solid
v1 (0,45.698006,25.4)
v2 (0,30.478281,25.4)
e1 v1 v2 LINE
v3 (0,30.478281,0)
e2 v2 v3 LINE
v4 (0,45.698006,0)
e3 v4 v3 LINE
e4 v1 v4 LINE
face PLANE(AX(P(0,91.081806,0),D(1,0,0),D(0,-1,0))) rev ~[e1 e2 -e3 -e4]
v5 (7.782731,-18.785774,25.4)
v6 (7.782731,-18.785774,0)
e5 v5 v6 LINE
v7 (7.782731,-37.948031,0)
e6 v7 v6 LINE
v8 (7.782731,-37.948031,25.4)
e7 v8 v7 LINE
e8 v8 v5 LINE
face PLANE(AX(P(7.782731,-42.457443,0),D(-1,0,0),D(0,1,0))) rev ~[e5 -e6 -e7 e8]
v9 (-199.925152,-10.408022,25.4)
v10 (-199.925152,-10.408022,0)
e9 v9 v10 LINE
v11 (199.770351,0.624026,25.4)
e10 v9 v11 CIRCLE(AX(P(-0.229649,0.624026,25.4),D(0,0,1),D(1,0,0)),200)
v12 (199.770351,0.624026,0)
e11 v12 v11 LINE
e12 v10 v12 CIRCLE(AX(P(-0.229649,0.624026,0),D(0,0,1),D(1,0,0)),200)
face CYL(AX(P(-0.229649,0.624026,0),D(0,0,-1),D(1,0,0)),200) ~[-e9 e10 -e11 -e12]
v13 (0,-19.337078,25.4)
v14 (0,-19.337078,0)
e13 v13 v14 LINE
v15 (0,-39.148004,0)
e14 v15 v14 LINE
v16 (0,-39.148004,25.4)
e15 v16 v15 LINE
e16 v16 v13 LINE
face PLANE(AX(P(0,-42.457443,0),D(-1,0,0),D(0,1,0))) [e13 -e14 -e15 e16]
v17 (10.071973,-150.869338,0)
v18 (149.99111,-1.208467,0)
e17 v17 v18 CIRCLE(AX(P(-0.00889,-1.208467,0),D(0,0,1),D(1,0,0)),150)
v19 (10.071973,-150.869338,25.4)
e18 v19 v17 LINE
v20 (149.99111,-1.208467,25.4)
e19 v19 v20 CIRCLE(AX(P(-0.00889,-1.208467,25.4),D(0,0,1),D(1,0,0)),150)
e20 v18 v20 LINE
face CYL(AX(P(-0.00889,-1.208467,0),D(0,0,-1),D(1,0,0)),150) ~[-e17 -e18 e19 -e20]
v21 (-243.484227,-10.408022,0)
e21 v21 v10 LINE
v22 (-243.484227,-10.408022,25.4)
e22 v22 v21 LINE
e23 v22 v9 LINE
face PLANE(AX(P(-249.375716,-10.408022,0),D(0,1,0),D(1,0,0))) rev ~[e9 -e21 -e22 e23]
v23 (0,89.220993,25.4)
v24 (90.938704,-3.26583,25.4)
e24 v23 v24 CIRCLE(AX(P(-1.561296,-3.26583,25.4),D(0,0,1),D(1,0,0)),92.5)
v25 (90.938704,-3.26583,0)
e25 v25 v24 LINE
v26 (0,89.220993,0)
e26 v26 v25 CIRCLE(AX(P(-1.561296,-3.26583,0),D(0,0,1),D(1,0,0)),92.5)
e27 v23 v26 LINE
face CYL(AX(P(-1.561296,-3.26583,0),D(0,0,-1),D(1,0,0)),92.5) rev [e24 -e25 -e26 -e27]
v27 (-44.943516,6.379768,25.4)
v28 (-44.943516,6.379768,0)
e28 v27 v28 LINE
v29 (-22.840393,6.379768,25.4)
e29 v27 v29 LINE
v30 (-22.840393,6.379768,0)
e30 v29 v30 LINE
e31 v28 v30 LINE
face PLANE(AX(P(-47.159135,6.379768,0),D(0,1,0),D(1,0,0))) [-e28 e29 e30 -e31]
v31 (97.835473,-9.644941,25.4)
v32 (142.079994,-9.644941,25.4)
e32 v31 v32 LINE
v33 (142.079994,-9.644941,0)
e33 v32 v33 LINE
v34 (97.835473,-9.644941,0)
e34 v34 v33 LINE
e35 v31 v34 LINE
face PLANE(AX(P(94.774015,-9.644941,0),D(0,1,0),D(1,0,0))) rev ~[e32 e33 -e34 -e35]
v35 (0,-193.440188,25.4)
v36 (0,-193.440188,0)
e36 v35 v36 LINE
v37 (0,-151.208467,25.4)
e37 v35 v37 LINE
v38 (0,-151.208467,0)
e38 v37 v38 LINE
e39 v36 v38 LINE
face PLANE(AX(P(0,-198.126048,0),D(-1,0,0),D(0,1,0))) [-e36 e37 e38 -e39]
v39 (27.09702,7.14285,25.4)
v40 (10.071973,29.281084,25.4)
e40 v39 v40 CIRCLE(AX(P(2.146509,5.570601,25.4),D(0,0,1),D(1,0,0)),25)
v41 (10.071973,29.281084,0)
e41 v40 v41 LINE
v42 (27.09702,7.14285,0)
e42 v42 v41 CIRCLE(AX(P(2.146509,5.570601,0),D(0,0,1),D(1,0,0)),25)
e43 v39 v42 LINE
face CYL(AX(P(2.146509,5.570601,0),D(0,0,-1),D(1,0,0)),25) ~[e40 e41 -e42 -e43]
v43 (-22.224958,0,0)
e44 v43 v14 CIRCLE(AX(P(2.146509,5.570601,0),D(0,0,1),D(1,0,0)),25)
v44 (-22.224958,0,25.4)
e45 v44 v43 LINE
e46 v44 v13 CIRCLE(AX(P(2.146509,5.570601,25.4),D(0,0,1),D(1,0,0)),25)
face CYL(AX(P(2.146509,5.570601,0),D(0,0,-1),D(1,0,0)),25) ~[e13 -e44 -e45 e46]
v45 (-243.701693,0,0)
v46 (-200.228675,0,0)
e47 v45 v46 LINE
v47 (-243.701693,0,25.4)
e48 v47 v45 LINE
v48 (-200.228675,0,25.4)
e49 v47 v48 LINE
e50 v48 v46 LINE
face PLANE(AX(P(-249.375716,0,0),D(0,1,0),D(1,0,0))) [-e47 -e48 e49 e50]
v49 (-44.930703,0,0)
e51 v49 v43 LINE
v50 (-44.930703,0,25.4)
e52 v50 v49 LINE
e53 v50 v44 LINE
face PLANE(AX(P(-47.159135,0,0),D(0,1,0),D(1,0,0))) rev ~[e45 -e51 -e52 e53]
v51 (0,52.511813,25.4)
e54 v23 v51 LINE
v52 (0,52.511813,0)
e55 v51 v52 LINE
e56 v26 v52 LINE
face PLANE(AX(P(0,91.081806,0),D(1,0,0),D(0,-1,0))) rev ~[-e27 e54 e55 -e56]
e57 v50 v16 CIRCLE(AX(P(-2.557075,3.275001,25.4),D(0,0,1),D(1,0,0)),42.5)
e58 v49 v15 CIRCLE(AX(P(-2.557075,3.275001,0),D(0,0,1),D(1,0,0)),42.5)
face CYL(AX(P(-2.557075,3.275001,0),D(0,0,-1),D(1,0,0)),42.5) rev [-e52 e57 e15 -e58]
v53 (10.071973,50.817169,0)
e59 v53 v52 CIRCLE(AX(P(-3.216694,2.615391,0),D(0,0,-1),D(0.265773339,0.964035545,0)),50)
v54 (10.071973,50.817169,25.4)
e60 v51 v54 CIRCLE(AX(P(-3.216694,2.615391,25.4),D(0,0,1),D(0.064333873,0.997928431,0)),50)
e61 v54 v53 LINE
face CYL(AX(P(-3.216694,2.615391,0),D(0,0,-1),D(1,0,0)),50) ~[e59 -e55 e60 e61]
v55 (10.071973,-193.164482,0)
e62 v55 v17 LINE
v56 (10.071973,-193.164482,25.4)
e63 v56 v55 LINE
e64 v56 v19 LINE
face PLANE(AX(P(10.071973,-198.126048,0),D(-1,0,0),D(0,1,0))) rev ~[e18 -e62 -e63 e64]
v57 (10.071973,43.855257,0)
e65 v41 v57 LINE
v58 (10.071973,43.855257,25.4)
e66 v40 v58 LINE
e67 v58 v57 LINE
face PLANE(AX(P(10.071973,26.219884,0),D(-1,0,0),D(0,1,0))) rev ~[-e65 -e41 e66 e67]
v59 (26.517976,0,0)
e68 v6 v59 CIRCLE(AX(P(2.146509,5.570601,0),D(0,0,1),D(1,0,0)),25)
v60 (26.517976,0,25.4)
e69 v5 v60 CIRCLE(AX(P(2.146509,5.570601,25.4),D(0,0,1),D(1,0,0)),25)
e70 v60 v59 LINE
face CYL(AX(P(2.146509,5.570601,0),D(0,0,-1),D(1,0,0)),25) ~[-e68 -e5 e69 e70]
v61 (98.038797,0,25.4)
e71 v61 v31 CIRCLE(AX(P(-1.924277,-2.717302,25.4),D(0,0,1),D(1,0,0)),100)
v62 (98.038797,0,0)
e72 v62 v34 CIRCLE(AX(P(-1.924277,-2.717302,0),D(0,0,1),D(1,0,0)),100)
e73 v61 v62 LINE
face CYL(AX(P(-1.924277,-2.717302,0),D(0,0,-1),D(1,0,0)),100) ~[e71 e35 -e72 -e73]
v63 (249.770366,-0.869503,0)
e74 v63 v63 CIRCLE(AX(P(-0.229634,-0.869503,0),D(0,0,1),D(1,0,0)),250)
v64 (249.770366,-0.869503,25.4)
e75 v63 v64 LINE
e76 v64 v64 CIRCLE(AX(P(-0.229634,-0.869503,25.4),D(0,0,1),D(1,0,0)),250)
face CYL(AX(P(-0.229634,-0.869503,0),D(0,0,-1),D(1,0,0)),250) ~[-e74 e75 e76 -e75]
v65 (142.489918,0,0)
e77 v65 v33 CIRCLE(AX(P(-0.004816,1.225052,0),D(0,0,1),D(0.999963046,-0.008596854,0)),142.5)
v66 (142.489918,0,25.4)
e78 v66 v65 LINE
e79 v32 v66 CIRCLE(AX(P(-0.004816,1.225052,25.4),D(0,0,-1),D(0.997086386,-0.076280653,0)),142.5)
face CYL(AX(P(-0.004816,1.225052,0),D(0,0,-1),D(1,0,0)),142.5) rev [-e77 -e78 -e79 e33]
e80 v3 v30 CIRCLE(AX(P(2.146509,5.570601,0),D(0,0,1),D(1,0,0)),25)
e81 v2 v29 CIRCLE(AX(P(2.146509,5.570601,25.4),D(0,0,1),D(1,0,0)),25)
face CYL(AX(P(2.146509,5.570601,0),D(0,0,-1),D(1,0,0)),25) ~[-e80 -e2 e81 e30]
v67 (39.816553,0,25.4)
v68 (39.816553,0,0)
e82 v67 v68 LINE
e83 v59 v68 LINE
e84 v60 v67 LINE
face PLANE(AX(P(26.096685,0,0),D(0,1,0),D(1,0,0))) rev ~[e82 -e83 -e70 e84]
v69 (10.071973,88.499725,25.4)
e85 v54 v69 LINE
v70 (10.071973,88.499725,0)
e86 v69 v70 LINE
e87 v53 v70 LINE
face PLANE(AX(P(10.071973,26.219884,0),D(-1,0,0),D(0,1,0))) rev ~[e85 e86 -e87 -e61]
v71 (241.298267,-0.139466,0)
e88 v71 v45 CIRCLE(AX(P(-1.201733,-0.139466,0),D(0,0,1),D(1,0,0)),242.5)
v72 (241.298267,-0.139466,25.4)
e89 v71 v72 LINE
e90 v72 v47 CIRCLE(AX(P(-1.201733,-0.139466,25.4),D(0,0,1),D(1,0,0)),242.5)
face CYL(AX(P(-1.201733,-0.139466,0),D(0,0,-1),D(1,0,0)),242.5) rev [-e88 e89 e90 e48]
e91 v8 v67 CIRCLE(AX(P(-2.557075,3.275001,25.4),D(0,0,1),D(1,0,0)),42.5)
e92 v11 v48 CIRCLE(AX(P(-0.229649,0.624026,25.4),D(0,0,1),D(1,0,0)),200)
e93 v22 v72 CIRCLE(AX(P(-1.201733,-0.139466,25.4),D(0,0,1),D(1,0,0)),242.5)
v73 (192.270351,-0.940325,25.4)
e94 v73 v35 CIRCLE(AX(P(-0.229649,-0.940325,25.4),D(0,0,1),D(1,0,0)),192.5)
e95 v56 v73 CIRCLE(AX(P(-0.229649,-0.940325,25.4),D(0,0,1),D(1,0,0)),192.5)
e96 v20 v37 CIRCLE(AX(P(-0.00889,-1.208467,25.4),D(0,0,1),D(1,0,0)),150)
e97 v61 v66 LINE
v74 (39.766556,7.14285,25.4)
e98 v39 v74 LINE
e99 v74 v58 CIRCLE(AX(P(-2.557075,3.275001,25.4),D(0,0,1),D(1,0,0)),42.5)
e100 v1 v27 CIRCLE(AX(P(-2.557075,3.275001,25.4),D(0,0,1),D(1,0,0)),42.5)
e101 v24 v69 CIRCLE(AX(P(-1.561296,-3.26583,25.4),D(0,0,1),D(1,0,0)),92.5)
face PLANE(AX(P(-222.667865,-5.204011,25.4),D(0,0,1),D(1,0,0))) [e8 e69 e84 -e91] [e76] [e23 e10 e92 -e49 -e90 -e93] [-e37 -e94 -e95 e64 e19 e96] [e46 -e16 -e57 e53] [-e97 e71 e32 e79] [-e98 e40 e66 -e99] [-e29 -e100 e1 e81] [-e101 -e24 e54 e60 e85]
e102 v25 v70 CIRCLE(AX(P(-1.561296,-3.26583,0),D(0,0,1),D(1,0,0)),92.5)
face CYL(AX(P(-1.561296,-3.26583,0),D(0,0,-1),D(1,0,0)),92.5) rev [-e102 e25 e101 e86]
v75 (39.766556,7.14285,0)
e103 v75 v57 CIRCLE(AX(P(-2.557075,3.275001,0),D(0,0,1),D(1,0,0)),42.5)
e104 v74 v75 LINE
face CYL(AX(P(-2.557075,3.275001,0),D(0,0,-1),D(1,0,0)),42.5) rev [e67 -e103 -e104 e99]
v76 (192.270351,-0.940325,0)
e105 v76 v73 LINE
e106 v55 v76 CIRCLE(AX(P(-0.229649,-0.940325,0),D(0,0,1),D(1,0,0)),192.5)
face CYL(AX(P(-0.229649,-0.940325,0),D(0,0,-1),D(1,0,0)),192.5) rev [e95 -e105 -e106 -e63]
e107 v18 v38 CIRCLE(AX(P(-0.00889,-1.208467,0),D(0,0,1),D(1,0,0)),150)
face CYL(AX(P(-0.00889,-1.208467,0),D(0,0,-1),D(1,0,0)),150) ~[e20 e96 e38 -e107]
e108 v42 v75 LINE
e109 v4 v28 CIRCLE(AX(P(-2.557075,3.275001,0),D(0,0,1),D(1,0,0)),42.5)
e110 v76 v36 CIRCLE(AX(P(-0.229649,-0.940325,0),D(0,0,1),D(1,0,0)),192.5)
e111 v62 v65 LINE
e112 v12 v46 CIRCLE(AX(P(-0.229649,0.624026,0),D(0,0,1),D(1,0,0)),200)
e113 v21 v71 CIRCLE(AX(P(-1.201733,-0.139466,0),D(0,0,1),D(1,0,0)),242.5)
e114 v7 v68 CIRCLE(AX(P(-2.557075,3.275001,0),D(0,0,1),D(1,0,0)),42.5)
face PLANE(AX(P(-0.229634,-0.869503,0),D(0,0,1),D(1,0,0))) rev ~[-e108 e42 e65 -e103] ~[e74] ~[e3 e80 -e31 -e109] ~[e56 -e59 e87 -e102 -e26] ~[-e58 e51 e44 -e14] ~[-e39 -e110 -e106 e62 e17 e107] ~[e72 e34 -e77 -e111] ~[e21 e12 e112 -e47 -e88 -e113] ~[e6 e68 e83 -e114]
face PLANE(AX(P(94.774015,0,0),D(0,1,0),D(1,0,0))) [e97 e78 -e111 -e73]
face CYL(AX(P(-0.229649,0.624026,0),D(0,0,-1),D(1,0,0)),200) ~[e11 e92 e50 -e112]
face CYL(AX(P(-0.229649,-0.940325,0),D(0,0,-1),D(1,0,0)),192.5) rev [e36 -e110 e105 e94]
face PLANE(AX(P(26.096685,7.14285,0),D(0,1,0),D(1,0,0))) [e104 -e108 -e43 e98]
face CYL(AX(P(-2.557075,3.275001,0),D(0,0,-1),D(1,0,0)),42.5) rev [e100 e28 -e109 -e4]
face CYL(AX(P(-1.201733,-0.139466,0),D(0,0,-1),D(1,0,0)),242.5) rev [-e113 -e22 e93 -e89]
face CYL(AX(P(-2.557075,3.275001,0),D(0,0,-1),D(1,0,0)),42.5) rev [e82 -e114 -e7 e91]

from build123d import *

# Parameters (mm, degrees)
F0_R      = 250
F0_R_2    = 242.5
F6_DEPTH  = 25.4
F1_R      = 200
F1_R_2    = 192.5
F7_DEPTH  = 25.4
F2_R      = 150
F2_R_2    = 142.5
F8_DEPTH  = 25.4
F3_R      = 100
F3_R_2    = 92.5
F9_DEPTH  = 25.4
F4_R      = 50
F4_R_2    = 42.5
F10_DEPTH = 25.4
F5_R      = 25
F11_DEPTH = 25.4
F12_W     = 53.4157007933
F12_H     = 10.408022441
F12_W_2   = 10.0719733164
F12_H_2   = 50.3633767366
F12_W_3   = 52.6525899768
F12_H_3   = 9.6449414268
F12_H_4   = 41.9694781303
F12_H_5   = 22.8924434632
F12_W_4   = 30.523262918
F12_H_6   = 6.3797682524
F12_W_5   = 17.5508763641
F12_H_7   = 7.1428497322
F12_W_6   = 7.7827312052
F12_H_8   = 28.9970943704
F13_DEPTH = 25.4


with BuildPart() as f6:
    # F0 (on Top) → F6 (new body)
    with BuildSketch(Plane.XY):
        with Locations((-0.2296342573, -0.8695026627)):
            Circle(F0_R)
        with Locations((-1.2017333358, -0.1394655317)):
            Circle(F0_R_2, mode=Mode.SUBTRACT)
    extrude(amount=F6_DEPTH)



with BuildPart() as f7:
    # F1 (on Top) → F7 (new body)
    with BuildSketch(Plane.XY):
        with Locations((-0.229648911, 0.6240262301)):
            Circle(F1_R)
        with Locations((-0.229648911, -0.9403247815)):
            Circle(F1_R_2, mode=Mode.SUBTRACT)
    extrude(amount=F7_DEPTH)


with BuildPart() as f8:
    # F2 (on Top) → F8 (new body)
    with BuildSketch(Plane.XY):
        with Locations((-0.0088901297, -1.2084672926)):
            Circle(F2_R)
        with Locations((-0.0048156621, 1.2250516324)):
            Circle(F2_R_2, mode=Mode.SUBTRACT)
    extrude(amount=F8_DEPTH)


with BuildPart() as f9:
    # F3 (on Top) → F9 (new body)
    with BuildSketch(Plane.XY):
        with Locations((-1.9242773997, -2.7173017152)):
            Circle(F3_R)
        with Locations((-1.5612963189, -3.2658300582)):
            Circle(F3_R_2, mode=Mode.SUBTRACT)
    extrude(amount=F9_DEPTH)


with BuildPart() as f10:
    # F4 (on Top) → F10 (new body)
    with BuildSketch(Plane.XY):
        with Locations((-3.2166936435, 2.6153912768)):
            Circle(F4_R)
        with Locations((-2.5570748915, 3.2750012369)):
            Circle(F4_R_2, mode=Mode.SUBTRACT)
    extrude(amount=F10_DEPTH)


with BuildPart() as f11:
    # F5 (on Top) → F11 (new body)
    with BuildSketch(Plane.XY):
        with Locations((2.1465087775, 5.5706012063)):
            Circle(F5_R)
    extrude(amount=F11_DEPTH)


with BuildPart() as f6_1:
    add(f6.part)

    add(f7.part)  # F13 merges F7

    add(f8.part)  # F13 merges F8

    add(f9.part)  # F13 merges F9

    add(f10.part)  # F13 merges F10

    add(f11.part)  # F13 merges F11
    # F12 (on face) → F13 (join)
    with BuildSketch(Plane.XY):
        with Locations((-222.6678654552, -5.2040112205)):
            Rectangle(F12_W, F12_H)
        with Locations((5.0359866582, -172.9443594813)):
            Rectangle(F12_W_2, F12_H_2)
        with Locations((121.1003102362, -4.8224707134)):
            Rectangle(F12_W_3, F12_H_3)
        with Locations((5.0359866582, 70.097066462)):
            Rectangle(F12_W_2, F12_H_4)
        with Locations((5.0359866582, 37.6661056653)):
            Rectangle(F12_W_2, F12_H_5)
        with Locations((-31.8975038826, 3.1898841262)):
            Rectangle(F12_W_4, F12_H_6)
        with Locations((34.8721230403, 3.5714248661)):
            Rectangle(F12_W_5, F12_H_7)
        with Locations((3.8913656026, -27.9588955455)):
            Rectangle(F12_W_6, F12_H_8)
    extrude(amount=F13_DEPTH)


solid = f6_1.part
